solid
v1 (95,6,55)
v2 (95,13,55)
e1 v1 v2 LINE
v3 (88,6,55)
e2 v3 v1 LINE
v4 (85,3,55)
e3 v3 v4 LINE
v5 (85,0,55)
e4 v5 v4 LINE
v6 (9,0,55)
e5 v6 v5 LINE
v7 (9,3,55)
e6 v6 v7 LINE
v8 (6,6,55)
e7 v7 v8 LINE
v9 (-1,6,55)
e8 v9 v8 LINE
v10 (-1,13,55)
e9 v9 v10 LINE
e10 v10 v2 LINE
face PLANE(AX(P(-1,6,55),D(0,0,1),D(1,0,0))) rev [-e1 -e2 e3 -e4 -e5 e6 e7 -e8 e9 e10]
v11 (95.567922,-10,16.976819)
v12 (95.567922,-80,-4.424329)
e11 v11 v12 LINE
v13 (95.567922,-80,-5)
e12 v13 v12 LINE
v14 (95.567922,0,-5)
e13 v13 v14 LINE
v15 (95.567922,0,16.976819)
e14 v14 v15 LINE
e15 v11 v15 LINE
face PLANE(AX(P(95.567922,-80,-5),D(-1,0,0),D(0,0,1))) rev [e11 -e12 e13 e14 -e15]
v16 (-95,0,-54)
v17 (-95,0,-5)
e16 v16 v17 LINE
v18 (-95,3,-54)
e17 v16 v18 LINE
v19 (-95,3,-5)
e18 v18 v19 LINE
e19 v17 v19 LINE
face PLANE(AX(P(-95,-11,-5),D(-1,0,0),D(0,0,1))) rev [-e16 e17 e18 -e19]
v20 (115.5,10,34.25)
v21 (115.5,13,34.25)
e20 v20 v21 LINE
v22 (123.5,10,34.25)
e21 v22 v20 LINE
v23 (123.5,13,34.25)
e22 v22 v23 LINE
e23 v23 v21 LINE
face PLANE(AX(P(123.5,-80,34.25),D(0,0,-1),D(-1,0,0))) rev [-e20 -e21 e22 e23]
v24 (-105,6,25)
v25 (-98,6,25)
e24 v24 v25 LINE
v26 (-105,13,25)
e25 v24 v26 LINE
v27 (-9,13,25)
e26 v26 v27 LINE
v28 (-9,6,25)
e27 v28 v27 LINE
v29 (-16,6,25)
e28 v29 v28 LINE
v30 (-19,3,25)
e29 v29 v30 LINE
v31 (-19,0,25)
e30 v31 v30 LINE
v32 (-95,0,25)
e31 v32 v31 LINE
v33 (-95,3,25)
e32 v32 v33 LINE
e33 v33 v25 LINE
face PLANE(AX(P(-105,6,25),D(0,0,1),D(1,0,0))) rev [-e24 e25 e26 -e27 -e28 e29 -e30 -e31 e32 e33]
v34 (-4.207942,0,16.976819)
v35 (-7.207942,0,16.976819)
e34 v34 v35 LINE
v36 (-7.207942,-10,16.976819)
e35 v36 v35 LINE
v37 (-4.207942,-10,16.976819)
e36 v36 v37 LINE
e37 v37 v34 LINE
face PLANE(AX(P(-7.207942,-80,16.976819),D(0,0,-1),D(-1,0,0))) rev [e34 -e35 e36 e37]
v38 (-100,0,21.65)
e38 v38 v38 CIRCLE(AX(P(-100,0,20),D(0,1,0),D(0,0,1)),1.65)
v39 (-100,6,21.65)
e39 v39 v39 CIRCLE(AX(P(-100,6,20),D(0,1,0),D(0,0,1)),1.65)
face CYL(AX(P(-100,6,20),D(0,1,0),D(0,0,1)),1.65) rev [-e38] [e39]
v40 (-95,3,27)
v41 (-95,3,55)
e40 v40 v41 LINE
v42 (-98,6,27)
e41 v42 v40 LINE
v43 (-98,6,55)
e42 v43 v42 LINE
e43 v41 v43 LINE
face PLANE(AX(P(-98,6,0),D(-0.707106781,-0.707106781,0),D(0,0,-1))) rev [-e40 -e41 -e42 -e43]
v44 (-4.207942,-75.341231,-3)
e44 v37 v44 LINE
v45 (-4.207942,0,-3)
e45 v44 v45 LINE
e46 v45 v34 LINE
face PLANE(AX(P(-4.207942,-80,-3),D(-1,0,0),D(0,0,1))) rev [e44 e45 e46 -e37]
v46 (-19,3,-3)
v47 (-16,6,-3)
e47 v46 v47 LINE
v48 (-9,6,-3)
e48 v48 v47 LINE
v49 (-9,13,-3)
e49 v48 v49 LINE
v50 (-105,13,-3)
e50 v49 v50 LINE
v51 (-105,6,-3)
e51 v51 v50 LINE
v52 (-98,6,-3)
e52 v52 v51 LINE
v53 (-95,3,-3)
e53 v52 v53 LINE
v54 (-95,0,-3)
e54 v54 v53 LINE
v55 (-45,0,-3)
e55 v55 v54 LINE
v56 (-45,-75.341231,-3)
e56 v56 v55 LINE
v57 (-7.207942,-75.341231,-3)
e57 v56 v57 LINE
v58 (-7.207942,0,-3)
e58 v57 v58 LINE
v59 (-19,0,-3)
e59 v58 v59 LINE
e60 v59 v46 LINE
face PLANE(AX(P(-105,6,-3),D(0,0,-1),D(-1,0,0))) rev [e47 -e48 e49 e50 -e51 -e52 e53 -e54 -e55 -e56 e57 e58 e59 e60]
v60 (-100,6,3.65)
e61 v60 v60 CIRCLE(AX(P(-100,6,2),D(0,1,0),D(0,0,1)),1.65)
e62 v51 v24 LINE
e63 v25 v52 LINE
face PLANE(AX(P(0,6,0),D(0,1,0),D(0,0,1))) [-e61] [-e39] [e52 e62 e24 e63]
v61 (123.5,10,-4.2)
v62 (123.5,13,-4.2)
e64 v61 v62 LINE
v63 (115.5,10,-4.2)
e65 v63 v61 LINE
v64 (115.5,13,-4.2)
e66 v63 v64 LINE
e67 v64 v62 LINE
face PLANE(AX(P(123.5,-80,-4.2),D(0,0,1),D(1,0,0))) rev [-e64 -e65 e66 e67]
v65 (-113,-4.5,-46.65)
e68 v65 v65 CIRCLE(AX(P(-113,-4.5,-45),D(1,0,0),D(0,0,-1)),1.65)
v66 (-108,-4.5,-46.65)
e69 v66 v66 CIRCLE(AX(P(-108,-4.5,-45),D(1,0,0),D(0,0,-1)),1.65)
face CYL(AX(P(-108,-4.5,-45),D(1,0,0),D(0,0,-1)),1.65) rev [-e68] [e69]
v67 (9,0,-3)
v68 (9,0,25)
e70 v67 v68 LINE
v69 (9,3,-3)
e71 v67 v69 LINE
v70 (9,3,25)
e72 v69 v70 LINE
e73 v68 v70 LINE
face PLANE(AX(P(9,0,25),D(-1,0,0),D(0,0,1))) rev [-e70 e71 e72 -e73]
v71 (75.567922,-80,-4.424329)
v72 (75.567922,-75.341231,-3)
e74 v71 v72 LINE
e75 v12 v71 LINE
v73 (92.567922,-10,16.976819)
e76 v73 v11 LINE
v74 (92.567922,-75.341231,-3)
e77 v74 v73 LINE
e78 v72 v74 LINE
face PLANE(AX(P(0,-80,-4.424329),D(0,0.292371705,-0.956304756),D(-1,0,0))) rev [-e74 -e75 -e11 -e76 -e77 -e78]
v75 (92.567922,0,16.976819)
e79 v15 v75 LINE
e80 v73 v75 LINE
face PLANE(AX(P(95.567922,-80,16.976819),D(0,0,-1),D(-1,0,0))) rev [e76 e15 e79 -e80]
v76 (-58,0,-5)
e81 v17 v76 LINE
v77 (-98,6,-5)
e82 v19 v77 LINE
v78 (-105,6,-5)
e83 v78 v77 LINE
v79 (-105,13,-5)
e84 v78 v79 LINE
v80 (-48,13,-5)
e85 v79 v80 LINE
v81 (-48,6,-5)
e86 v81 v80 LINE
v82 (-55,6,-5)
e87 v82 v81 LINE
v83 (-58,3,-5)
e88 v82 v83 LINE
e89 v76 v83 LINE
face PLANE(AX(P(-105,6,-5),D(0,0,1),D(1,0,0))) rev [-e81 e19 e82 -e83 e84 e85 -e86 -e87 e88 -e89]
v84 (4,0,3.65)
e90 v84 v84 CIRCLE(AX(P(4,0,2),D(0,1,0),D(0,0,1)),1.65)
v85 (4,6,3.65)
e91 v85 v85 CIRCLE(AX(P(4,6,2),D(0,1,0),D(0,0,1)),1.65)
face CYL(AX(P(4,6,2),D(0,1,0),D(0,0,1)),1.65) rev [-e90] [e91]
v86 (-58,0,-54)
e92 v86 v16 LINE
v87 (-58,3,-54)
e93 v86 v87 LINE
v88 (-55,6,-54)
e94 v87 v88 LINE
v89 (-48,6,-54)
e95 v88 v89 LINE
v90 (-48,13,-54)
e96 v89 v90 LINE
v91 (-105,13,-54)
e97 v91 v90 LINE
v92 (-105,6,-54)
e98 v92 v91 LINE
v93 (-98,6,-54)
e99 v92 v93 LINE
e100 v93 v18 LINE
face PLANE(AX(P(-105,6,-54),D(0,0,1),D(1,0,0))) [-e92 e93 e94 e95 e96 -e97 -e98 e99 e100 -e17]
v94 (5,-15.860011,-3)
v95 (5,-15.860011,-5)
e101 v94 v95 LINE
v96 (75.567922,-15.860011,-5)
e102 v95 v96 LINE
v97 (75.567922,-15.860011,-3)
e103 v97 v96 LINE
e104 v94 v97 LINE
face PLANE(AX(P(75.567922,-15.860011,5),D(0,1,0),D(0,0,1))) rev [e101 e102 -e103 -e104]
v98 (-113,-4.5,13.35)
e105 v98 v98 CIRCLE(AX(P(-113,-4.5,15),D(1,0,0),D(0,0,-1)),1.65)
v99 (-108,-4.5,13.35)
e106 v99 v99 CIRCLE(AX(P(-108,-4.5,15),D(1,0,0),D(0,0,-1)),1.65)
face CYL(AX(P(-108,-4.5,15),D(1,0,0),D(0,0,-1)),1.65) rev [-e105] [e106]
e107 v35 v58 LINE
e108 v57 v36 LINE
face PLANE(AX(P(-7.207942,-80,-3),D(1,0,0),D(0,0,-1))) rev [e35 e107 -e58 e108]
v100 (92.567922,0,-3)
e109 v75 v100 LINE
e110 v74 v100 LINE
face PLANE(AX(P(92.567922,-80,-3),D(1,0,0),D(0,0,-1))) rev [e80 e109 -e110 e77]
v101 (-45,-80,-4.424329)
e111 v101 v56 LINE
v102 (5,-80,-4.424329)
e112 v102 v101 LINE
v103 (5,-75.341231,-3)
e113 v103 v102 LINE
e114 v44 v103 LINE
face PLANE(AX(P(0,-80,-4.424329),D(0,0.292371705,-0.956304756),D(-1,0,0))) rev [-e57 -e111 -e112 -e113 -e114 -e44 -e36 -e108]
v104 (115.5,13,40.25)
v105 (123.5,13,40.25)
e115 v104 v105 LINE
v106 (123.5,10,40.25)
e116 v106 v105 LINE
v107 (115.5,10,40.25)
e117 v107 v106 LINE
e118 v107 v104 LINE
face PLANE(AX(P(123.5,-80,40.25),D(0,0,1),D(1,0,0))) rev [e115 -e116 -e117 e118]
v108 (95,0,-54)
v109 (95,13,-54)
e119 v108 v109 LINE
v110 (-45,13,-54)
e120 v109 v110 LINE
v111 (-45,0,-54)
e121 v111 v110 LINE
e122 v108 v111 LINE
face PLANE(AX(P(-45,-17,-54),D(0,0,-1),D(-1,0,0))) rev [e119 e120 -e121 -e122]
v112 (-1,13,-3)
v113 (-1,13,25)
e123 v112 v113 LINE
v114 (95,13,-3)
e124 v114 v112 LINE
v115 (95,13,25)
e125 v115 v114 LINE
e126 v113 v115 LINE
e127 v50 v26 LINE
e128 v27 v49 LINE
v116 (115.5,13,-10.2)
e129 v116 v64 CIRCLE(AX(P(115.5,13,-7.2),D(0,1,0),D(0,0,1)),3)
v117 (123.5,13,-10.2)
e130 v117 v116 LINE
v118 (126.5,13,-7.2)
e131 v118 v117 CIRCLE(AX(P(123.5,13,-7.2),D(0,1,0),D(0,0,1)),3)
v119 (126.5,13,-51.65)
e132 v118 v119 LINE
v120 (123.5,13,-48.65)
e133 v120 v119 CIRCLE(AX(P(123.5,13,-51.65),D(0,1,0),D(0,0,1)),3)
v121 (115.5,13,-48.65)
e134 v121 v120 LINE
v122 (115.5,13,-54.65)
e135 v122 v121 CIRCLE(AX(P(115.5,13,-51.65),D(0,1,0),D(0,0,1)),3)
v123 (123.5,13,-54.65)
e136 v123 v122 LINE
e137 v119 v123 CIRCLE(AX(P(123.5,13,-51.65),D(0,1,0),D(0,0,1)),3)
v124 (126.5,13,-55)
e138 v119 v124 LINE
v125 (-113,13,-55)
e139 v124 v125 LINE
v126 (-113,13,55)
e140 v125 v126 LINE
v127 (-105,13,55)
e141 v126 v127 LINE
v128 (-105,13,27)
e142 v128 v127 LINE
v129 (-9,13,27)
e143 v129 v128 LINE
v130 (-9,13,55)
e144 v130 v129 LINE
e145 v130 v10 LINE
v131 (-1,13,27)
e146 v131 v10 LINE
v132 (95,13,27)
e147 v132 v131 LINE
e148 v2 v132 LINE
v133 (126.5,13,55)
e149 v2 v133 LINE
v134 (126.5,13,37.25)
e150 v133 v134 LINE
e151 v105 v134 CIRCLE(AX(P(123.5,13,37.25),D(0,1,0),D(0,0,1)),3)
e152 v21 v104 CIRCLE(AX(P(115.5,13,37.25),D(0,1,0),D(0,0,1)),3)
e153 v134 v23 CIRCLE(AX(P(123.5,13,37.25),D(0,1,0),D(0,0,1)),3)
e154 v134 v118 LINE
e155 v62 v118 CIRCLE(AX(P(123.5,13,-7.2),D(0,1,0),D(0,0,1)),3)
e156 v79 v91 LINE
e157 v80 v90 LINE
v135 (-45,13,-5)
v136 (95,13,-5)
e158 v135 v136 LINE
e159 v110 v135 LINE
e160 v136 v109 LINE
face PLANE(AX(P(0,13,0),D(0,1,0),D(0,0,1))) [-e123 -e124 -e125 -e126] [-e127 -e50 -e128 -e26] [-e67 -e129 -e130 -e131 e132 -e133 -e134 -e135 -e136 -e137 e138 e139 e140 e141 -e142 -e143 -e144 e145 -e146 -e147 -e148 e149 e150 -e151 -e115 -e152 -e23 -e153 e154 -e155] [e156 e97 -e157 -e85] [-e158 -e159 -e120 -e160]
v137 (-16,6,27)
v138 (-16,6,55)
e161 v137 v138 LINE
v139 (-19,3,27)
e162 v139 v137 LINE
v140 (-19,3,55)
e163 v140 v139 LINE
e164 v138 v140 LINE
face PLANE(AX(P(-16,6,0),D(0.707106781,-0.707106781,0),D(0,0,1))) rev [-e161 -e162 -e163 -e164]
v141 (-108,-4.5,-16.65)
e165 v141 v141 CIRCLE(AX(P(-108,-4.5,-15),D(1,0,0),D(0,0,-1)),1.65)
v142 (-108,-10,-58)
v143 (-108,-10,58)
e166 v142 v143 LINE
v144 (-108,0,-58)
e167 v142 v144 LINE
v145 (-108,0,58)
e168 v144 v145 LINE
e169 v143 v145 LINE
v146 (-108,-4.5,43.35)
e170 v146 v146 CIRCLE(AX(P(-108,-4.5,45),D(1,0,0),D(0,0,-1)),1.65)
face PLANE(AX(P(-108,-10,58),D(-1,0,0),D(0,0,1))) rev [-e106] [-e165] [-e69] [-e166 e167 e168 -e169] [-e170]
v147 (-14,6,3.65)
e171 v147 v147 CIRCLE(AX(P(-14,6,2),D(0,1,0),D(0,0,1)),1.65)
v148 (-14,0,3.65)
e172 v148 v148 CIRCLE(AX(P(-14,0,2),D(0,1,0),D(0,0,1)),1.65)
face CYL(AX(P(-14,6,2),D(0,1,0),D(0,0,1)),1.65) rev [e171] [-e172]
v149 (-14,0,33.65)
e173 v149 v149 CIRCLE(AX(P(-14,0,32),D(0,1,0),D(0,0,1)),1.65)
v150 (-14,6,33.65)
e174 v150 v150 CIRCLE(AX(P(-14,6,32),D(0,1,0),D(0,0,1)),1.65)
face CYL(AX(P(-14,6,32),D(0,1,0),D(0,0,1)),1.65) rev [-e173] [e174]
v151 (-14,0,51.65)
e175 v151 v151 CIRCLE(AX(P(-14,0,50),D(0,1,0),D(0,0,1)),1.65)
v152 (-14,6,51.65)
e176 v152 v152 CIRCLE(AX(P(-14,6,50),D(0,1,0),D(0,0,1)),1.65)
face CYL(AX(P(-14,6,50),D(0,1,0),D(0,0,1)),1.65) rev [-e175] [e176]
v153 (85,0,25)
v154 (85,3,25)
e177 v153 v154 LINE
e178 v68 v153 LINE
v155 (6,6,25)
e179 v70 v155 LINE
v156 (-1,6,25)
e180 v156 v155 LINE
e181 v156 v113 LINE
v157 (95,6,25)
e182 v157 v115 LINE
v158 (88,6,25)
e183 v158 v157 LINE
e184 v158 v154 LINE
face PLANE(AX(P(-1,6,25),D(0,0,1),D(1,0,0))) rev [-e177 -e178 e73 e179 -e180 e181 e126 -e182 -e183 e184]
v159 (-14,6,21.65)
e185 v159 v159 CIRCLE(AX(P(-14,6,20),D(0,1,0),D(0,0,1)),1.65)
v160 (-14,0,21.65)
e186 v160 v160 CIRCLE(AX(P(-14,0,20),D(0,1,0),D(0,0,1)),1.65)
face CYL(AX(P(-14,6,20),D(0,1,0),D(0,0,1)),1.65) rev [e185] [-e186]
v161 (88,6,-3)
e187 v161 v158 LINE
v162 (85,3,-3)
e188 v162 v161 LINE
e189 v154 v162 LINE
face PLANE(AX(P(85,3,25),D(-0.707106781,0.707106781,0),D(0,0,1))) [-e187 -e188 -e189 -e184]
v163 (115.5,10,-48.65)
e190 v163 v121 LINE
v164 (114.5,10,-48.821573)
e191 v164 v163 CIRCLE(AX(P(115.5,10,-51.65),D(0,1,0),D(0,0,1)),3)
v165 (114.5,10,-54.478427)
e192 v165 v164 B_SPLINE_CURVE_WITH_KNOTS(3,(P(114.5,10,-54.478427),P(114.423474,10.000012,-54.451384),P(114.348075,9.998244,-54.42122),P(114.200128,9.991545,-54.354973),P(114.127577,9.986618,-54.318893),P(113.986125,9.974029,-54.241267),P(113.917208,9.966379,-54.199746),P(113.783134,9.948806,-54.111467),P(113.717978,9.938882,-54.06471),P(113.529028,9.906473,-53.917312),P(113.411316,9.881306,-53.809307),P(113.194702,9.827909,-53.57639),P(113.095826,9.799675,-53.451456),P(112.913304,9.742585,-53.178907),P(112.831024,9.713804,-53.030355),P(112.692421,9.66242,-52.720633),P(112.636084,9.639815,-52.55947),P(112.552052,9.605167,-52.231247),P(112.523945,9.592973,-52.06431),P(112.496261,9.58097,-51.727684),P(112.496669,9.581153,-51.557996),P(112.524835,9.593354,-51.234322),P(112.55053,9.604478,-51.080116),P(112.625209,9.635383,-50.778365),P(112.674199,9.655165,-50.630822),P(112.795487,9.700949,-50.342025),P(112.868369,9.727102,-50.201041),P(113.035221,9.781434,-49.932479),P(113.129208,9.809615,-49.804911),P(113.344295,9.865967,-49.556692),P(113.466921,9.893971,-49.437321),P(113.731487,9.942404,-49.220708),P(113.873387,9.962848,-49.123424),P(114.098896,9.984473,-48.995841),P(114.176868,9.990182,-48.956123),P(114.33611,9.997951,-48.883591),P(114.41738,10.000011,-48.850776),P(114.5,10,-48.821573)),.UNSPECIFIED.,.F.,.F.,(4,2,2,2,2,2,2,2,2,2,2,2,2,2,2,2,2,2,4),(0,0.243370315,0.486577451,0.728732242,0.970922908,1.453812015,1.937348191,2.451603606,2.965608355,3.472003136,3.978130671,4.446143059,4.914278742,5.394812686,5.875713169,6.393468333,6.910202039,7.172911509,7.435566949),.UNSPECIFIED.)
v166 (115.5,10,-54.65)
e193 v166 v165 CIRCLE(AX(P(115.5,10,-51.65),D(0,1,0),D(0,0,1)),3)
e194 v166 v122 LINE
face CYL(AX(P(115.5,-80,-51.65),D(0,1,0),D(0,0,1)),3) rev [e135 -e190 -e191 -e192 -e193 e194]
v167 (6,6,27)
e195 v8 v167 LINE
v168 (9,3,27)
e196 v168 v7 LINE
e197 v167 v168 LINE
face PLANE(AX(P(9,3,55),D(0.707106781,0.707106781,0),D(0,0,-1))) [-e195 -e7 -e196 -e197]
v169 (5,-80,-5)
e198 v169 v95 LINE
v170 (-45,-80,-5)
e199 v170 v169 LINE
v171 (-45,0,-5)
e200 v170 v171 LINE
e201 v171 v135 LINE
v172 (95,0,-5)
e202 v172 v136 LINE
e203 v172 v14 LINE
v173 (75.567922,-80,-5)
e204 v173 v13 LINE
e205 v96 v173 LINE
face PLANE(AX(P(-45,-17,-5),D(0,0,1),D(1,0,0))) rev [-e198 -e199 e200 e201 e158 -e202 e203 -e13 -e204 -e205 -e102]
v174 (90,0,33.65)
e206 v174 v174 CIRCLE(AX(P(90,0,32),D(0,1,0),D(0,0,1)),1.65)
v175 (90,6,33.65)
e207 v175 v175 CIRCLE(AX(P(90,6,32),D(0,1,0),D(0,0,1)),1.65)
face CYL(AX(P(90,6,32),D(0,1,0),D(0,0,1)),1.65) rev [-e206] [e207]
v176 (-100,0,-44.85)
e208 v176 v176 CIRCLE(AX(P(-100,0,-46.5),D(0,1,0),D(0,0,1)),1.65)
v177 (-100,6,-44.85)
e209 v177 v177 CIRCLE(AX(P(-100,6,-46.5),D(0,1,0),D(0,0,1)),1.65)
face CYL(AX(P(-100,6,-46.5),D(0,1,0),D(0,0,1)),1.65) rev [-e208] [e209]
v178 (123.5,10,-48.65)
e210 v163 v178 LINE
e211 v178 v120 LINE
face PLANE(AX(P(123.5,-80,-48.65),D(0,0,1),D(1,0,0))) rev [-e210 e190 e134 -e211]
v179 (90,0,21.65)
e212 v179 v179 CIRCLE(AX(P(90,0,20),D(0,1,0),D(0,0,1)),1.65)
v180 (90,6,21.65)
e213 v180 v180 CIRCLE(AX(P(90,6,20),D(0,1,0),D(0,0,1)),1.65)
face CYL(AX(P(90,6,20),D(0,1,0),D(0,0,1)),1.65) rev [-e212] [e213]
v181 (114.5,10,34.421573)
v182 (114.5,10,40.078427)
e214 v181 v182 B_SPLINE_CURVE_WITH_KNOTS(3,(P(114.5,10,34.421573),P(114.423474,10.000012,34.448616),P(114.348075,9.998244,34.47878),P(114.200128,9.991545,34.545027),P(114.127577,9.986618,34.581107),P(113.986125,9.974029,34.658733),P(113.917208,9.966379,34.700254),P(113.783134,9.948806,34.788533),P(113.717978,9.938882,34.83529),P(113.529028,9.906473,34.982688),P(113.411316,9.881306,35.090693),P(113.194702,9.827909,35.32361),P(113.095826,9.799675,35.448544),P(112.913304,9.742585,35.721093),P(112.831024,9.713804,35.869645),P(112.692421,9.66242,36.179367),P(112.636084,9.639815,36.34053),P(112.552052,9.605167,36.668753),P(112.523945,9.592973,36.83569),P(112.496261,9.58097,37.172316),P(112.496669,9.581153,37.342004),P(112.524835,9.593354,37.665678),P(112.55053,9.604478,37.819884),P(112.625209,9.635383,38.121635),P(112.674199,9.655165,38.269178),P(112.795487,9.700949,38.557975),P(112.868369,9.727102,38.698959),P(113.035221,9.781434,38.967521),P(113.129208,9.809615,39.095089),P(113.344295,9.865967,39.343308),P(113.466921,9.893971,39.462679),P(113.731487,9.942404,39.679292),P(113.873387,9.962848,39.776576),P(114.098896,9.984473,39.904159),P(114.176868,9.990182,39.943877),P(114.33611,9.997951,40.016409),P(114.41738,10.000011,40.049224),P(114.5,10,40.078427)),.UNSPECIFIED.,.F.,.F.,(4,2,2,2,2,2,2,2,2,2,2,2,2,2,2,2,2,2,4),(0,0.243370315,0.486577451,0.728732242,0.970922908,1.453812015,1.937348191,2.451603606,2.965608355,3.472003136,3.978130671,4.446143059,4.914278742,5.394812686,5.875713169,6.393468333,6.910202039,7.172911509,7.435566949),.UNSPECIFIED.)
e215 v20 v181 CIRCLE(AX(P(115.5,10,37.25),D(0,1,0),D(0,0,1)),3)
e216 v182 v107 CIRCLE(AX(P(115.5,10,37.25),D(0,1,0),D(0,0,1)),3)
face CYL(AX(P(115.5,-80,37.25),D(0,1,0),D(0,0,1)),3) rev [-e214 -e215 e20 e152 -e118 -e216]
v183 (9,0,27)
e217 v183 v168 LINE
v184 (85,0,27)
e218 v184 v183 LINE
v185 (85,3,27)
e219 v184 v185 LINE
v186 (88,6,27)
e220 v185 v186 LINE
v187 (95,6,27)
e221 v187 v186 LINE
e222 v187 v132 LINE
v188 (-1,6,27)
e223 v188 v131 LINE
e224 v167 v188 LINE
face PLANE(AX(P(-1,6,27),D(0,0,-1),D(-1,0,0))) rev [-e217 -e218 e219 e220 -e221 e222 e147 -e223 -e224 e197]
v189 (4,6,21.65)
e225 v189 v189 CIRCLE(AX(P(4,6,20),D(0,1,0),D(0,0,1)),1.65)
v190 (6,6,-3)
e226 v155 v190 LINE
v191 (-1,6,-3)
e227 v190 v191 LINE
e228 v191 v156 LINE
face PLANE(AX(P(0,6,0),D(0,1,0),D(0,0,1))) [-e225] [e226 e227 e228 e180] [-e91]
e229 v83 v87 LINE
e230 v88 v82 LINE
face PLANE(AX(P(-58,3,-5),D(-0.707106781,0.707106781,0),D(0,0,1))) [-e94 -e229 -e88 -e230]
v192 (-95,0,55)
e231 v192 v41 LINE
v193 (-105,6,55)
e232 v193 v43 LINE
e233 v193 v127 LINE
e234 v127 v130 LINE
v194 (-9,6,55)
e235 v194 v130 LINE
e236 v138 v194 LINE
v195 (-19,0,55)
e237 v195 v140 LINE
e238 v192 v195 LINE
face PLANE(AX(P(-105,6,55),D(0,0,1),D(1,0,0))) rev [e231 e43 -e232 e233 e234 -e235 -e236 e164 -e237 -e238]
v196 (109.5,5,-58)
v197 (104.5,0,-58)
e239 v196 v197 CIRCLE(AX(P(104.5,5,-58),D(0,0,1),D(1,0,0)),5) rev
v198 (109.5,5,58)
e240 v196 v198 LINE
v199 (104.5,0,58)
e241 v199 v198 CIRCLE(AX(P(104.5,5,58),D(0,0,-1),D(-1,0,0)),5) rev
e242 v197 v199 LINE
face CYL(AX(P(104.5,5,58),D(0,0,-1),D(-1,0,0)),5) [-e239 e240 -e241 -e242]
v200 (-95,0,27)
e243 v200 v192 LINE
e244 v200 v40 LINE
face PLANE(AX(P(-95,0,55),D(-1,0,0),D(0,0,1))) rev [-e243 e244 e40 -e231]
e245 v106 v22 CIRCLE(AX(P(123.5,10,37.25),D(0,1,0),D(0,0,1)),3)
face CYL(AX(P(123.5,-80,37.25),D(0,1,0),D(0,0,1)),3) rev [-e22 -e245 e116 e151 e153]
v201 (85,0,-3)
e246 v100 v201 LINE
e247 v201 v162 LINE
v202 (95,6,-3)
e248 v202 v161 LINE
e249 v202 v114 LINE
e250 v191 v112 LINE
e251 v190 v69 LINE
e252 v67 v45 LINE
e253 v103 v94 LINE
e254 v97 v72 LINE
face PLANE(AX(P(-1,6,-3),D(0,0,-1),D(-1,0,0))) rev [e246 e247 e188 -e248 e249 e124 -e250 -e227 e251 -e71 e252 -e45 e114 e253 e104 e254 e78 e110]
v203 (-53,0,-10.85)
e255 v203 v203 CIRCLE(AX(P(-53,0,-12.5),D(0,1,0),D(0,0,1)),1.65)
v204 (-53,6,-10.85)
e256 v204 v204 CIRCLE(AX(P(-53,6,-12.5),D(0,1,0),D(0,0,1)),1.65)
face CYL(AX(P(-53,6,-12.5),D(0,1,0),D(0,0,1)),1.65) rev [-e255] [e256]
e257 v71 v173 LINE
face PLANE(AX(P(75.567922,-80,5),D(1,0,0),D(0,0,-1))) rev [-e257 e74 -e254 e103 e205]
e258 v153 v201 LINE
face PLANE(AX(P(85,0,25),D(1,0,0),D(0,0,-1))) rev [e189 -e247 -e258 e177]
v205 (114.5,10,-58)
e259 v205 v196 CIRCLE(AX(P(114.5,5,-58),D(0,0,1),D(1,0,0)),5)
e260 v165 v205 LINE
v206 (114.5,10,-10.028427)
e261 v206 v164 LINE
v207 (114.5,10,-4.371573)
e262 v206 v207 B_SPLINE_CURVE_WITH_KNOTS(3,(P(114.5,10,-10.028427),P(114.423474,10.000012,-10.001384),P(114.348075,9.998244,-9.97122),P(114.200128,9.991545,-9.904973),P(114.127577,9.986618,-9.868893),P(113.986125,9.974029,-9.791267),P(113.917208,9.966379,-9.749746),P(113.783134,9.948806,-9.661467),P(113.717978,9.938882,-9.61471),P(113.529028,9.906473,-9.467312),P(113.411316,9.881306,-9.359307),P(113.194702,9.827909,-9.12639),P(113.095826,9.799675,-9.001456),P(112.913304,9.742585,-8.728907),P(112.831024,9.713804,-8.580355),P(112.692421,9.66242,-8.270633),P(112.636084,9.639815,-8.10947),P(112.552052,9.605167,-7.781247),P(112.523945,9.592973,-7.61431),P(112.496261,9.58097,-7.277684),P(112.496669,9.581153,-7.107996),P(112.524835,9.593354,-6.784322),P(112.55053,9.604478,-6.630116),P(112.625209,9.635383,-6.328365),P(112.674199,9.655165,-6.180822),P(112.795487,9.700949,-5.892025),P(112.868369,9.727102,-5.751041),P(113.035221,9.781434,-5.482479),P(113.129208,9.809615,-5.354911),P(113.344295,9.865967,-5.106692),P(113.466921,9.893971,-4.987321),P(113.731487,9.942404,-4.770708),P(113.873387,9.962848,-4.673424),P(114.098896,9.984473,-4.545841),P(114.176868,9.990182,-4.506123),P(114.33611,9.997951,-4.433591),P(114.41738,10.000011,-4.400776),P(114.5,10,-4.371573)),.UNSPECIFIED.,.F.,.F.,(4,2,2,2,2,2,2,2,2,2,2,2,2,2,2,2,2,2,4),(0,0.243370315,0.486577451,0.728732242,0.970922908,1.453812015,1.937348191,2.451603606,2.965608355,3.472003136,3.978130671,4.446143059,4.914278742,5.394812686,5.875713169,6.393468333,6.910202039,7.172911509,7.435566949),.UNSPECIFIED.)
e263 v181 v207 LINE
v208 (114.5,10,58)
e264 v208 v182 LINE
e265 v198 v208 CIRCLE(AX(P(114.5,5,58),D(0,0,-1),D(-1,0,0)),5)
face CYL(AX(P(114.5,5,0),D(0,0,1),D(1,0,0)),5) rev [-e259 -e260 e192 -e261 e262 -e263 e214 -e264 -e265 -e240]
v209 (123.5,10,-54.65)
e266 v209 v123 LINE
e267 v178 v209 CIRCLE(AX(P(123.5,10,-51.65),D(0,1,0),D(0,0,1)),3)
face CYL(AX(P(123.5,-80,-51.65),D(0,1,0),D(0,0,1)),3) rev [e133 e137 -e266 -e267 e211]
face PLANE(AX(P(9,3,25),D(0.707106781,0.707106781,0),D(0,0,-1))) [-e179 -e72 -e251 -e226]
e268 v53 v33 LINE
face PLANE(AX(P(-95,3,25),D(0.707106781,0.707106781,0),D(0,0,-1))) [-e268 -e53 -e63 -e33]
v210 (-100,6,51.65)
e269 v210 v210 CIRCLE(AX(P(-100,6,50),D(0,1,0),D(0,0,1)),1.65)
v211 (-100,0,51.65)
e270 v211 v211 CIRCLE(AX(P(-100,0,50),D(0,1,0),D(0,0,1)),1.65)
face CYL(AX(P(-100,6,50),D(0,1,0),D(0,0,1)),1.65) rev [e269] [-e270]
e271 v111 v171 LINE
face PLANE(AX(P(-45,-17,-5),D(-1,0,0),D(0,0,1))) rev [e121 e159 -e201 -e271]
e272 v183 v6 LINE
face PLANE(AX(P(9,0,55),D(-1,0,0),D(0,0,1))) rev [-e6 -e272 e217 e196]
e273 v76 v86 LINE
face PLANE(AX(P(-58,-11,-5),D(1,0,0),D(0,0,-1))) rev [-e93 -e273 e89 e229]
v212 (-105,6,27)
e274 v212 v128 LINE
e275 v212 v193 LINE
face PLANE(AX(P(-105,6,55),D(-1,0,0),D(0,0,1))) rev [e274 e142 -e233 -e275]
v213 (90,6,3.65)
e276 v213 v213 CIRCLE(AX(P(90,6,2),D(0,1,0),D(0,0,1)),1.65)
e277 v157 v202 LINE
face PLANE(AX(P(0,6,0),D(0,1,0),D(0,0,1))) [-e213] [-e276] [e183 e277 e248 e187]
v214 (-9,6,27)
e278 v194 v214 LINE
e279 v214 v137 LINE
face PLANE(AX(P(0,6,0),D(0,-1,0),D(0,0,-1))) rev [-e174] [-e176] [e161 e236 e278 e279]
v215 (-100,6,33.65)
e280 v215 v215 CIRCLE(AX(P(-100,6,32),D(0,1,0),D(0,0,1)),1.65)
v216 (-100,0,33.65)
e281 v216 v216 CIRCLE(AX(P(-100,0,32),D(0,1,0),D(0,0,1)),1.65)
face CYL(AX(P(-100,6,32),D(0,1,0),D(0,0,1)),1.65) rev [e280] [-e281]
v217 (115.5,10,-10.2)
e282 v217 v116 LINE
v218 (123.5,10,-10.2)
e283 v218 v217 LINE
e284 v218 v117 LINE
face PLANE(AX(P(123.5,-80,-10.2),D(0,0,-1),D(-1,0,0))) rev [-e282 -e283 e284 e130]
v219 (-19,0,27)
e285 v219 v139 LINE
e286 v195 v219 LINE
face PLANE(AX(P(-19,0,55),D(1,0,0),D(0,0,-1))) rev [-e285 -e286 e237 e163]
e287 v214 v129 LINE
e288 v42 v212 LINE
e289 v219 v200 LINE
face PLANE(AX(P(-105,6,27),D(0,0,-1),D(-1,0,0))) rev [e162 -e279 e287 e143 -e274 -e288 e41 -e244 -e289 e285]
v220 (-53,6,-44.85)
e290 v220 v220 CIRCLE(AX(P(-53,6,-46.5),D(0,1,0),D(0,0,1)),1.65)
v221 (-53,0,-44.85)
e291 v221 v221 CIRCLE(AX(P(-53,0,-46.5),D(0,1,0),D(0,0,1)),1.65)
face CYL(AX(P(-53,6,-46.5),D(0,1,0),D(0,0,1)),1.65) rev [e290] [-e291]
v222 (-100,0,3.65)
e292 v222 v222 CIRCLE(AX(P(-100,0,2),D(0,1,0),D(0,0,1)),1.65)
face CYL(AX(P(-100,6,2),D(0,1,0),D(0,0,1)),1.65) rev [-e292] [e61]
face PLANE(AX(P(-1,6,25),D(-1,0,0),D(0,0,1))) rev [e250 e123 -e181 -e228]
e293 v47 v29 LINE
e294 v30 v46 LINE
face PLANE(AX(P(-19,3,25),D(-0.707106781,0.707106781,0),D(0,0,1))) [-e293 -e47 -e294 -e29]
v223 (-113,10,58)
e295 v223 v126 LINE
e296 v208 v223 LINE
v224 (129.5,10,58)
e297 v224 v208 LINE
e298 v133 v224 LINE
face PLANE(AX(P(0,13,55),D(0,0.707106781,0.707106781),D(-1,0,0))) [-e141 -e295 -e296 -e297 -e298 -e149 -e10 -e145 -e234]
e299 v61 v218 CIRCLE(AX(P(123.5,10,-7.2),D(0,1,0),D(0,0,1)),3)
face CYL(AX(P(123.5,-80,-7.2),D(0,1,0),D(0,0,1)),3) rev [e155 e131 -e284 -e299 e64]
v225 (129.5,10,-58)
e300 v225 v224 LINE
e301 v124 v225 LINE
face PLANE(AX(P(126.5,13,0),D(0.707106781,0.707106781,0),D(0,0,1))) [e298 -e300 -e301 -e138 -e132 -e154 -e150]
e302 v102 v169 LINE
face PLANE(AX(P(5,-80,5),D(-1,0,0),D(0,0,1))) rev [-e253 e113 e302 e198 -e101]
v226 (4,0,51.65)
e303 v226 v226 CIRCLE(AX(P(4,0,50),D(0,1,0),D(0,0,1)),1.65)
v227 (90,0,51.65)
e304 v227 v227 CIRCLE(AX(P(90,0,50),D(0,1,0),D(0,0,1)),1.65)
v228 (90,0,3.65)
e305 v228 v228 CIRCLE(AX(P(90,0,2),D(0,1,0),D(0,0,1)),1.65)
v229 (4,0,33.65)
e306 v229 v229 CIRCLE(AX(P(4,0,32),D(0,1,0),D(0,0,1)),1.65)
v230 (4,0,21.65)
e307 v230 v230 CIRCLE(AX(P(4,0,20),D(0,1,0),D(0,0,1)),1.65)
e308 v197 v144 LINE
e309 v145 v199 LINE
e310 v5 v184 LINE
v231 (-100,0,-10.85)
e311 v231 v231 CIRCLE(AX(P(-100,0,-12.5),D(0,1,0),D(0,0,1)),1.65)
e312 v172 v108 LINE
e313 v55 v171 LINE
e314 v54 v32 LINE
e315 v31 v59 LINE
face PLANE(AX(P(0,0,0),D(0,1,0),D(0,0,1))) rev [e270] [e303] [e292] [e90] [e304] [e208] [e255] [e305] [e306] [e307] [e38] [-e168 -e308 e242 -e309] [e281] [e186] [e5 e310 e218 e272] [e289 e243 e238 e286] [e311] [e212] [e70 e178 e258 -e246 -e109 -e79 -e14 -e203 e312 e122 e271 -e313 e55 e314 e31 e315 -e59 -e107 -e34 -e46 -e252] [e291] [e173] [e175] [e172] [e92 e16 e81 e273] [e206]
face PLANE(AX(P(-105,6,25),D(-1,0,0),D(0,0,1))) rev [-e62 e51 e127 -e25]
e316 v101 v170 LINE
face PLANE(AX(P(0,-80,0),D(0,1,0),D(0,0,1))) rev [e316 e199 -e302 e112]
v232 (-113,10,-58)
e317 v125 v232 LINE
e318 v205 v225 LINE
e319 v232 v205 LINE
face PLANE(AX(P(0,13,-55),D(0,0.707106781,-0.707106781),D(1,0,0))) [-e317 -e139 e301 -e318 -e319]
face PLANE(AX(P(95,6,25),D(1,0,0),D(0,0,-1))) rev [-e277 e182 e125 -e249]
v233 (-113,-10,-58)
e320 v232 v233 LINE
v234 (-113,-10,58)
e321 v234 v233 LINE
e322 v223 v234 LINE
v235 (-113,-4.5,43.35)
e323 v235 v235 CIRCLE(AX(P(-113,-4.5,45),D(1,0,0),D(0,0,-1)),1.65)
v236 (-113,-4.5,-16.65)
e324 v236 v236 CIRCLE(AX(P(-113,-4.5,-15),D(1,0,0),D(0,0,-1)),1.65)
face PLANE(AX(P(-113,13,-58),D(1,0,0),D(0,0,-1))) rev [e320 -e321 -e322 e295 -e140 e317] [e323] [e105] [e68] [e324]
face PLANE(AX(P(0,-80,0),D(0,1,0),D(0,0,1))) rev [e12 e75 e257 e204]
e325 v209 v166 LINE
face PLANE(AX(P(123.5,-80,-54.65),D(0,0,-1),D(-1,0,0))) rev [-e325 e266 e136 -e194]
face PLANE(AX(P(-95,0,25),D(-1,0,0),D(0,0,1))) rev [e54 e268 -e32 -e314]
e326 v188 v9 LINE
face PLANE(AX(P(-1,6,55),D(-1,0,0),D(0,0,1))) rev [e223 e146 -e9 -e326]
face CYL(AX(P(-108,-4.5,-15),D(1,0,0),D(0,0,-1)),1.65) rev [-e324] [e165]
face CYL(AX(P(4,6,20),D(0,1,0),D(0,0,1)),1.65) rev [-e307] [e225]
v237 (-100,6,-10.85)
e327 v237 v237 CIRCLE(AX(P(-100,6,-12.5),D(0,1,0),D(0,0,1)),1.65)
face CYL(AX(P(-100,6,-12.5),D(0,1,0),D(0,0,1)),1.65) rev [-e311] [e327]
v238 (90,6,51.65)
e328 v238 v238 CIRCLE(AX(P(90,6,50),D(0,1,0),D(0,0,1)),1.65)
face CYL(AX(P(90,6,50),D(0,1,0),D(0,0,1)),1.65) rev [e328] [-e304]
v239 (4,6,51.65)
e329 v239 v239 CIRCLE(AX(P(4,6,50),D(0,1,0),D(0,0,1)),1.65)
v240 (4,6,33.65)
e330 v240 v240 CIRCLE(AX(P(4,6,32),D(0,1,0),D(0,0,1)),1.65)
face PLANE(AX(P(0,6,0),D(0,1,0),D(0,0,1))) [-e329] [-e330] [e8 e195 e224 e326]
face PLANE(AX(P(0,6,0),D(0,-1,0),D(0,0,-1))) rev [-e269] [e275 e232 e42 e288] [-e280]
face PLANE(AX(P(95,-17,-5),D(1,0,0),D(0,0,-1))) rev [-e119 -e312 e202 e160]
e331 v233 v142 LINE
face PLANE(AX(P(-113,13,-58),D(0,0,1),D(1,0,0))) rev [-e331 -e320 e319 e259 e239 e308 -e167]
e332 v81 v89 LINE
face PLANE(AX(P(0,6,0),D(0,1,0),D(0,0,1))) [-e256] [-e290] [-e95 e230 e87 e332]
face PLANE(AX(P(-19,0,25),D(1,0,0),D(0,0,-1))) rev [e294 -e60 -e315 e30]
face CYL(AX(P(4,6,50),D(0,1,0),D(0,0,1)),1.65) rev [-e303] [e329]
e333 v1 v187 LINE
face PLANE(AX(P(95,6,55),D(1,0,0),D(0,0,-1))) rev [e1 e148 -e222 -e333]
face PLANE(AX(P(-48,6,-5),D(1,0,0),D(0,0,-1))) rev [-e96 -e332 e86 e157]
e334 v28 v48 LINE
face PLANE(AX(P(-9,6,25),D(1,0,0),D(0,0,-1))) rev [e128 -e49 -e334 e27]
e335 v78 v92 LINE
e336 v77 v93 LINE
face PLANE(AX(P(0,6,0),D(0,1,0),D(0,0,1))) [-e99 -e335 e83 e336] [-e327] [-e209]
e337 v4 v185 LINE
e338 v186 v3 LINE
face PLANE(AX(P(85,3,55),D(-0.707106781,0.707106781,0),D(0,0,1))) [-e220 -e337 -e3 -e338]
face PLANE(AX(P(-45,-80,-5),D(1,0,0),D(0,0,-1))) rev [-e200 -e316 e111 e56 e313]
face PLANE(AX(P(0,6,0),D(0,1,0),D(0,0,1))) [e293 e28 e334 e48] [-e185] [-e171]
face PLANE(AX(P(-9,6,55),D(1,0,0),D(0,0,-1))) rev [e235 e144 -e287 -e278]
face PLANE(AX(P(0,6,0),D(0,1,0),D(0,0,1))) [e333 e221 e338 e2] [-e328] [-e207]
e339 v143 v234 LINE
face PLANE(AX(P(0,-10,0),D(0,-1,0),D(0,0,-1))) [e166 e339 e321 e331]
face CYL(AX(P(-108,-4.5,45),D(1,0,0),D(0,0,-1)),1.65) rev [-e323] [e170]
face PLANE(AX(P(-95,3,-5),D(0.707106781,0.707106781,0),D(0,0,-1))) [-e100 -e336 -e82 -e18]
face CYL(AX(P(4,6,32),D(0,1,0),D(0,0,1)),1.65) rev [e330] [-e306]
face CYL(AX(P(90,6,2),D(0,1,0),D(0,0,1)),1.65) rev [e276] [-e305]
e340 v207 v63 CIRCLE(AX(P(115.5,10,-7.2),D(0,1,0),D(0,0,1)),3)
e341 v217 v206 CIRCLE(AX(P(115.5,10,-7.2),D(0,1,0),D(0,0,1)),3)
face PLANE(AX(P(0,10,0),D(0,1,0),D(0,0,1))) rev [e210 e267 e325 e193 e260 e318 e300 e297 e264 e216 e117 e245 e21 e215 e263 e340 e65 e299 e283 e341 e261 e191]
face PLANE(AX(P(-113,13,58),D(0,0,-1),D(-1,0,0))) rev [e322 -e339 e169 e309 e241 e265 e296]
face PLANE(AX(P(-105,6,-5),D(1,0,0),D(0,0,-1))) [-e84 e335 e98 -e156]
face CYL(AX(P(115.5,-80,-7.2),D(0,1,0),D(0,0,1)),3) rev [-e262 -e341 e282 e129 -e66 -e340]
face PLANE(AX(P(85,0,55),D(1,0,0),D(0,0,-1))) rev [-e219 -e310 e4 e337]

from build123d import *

# Parameters (mm, degrees)
SKETCH1_W                      = 242.5
SKETCH1_H                      = 116
BOSS_EXTRUDE1_DEPTH            = 13
SKETCH32_W                     = 20
SKETCH32_H                     = 116
CUT_EXTRUDE10_DEPTH            = 10
FILLET1_START                  = -59
FILLET1_DEPTH                  = 118
FILLET1_START_2                = -58
FILLET1_2_DEPTH                = 116
SKETCH36_W                     = 96
SKETCH36_H                     = 28
CUT_EXTRUDE11_DEPTH            = 7
SKETCH37_W                     = 76
SKETCH37_H                     = 28
CUT_EXTRUDE12_DEPTH            = 143.489473295
M4X0_7_TAPPED_HOLE1_AT_2_COUNT = 2
M4X0_7_TAPPED_HOLE1_AT_2_PITCH = 18
M4X0_7_TAPPED_HOLE1_AT_3_COUNT = 2
M4X0_7_TAPPED_HOLE1_AT_3_PITCH = 86
M4X0_7_TAPPED_HOLE1_AT_4_COUNT = 2
M4X0_7_TAPPED_HOLE1_AT_4_PITCH = 87.863530546
LPATTERN1_COUNT                = 2
LPATTERN1_PITCH                = 30
LPATTERN1_COUNT_DIR2           = 2
LPATTERN1_PITCH_DIR2           = 104
CHAMFER1_SIZE                  = 3
SKETCH41_W                     = 140
SKETCH41_H                     = 49
CUT_EXTRUDE13_DEPTH            = 30
BOSS_EXTRUDE2_DEPTH            = 80
SKETCH43_W                     = 57
SKETCH43_H                     = 49
CUT_EXTRUDE14_DEPTH            = 7
SKETCH44_W                     = 37
SKETCH44_H                     = 49
CUT_EXTRUDE15_DEPTH            = 17
CHAMFER2_SIZE                  = 3
M4X0_7_TAPPED_HOLE2_D          = 3.3
M4X0_7_TAPPED_HOLE2_DEPTH      = 10.1
M4X0_7_TAPPED_HOLE2_TIP        = 0.991420021
CHAMFER3_SIZE                  = 70
CHAMFER3_SIZE2                 = 21.401147702
SKETCH48_W                     = 5
SKETCH48_H                     = 116
BOSS_EXTRUDE3_DEPTH            = 10
SKETCH49_W                     = 70.567921878
SKETCH49_H                     = 64.139989259
CUT_EXTRUDE16_DEPTH            = 10
M4X0_7_TAPPED_HOLE3_D          = 3.3
M4X0_7_TAPPED_HOLE3_DEPTH      = 5
CUT_EXTRUDE17_DEPTH            = 170.656270146


with BuildPart() as part:
    # Sketch1 → Boss-Extrude1 (new body)
    with BuildSketch(Plane(origin=(0, 0, 0), x_dir=(1, 0, 0), z_dir=(0, 1, 0))):
        with Locations((8.25, 0)):
            Rectangle(SKETCH1_W, SKETCH1_H)
    extrude(amount=BOSS_EXTRUDE1_DEPTH)

    # Sketch32 → Cut-Extrude10 (cut)
    with BuildSketch(Plane.XZ):
        with Locations((119.5, 0)):
            Rectangle(SKETCH32_W, SKETCH32_H)
    extrude(amount=-CUT_EXTRUDE10_DEPTH, mode=Mode.SUBTRACT)

    # Fillet1: read off the stored shape, not the designer's step
    # Fillet1 outline → Fillet1 (cut)
    with BuildSketch(Plane.XY.offset(FILLET1_START)):
        with BuildLine():
            Line((109.5, 0), (109.5, 5))
            ThreePointArc((109.5, 5), (108.035533906, 1.464466094), (104.5, 0))
            Line((104.5, 0), (109.5, 0))
        make_face()
    extrude(amount=FILLET1_DEPTH, mode=Mode.SUBTRACT)

    # Fillet1 2 outline → Fillet1 2 (add)
    with BuildSketch(Plane.XY.offset(FILLET1_START_2)):
        with BuildLine():
            ThreePointArc((109.5, 5), (110.964466094, 8.535533906), (114.5, 10))
            Line((114.5, 10), (109.5, 10))
            Line((109.5, 10), (109.5, 5))
        make_face()
    extrude(amount=FILLET1_2_DEPTH)

    # Sketch36 → Cut-Extrude11 (cut)
    with BuildSketch(Plane(origin=(0, 13, 0), x_dir=(1, 0, 0), z_dir=(0, 1, 0))):
        with Locations((-57, -41)):
            Rectangle(SKETCH36_W, SKETCH36_H)
        with Locations((-57, -11)):
            Rectangle(SKETCH36_W, SKETCH36_H)
        with Locations((47, -11)):
            Rectangle(SKETCH36_W, SKETCH36_H)
        with Locations((47, -41)):
            Rectangle(SKETCH36_W, SKETCH36_H)
    extrude(amount=-CUT_EXTRUDE11_DEPTH, mode=Mode.SUBTRACT)

    # Sketch37 → Cut-Extrude12 (cut, through all)
    with BuildSketch(Plane(origin=(0, 13, 0), x_dir=(1, 0, 0), z_dir=(0, 1, 0))):
        with Locations((-57, -41)):
            Rectangle(SKETCH37_W, SKETCH37_H)
        with Locations((-57, -11)):
            Rectangle(SKETCH37_W, SKETCH37_H)
        with Locations((47, -11)):
            Rectangle(SKETCH37_W, SKETCH37_H)
        with Locations((47, -41)):
            Rectangle(SKETCH37_W, SKETCH37_H)
    extrude(amount=-CUT_EXTRUDE12_DEPTH, mode=Mode.SUBTRACT)

    # Sketch39 → M4x0.7 Tapped Hole1 (revolve, cut)
    with BuildSketch(Plane(origin=(-100, 6, 50), x_dir=(0, 0, 1), z_dir=(1, 0, 0))):
        Polygon((0, 0), (0, 11.091420021), (1.65, 10.1), (1.65, 0), align=None)
    m4x0_7_tapped_hole1 = revolve(axis=Axis((-100, 12.35, 50), (0, -1, 0)), mode=Mode.SUBTRACT)

    # M4x0.7 Tapped Hole1 at 2: M4x0.7 Tapped Hole1 ×2
    with Locations(*[(0, 0, -i * M4X0_7_TAPPED_HOLE1_AT_2_PITCH) for i in range(1, M4X0_7_TAPPED_HOLE1_AT_2_COUNT)]):
        add(m4x0_7_tapped_hole1, mode=Mode.SUBTRACT)

    # M4x0.7 Tapped Hole1 at 3: M4x0.7 Tapped Hole1 ×2
    with Locations(*[(i * M4X0_7_TAPPED_HOLE1_AT_3_PITCH, 0, 0) for i in range(1, M4X0_7_TAPPED_HOLE1_AT_3_COUNT)]):
        add(m4x0_7_tapped_hole1, mode=Mode.SUBTRACT)

    # M4x0.7 Tapped Hole1 at 4: M4x0.7 Tapped Hole1 ×2
    with Locations(*[Vector(0.9787906252528686, 0, -0.20486315412269346) * (i * M4X0_7_TAPPED_HOLE1_AT_4_PITCH) for i in range(1, M4X0_7_TAPPED_HOLE1_AT_4_COUNT)]):
        add(m4x0_7_tapped_hole1, mode=Mode.SUBTRACT)

    # LPattern1: M4x0.7 Tapped Hole1 2 × 2
    with Locations(*[(j * LPATTERN1_PITCH_DIR2, 0, -i * LPATTERN1_PITCH) for i in range(LPATTERN1_COUNT) for j in range(LPATTERN1_COUNT_DIR2) if (i, j) != (0, 0)]):
        add(m4x0_7_tapped_hole1, mode=Mode.SUBTRACT)

    # LPattern1 copy 1 sketch → LPattern1 copy 1 (revolve, cut)
    with BuildSketch(Plane(origin=(4, 6, 32), x_dir=(0, 0, 1), z_dir=(1, 0, 0))):
        Polygon((0, 0), (0, 11.091420021), (1.65, 10.1), (1.65, 0), align=None)
    revolve(axis=Axis((4, 12.35, 32), (0, -1, 0)), mode=Mode.SUBTRACT)

    # LPattern1 copy 2 sketch → LPattern1 copy 2 (revolve, cut)
    with BuildSketch(Plane(origin=(-100, 6, 2), x_dir=(0, 0, 1), z_dir=(1, 0, 0))):
        Polygon((0, 0), (0, 11.091420021), (1.65, 10.1), (1.65, 0), align=None)
    revolve(axis=Axis((-100, 12.35, 2), (0, -1, 0)), mode=Mode.SUBTRACT)

    # LPattern1 copy 3 sketch → LPattern1 copy 3 (revolve, cut)
    with BuildSketch(Plane(origin=(4, 6, 2), x_dir=(0, 0, 1), z_dir=(1, 0, 0))):
        Polygon((0, 0), (0, 11.091420021), (1.65, 10.1), (1.65, 0), align=None)
    revolve(axis=Axis((4, 12.35, 2), (0, -1, 0)), mode=Mode.SUBTRACT)

    # LPattern1 copy 4 sketch → LPattern1 copy 4 (revolve, cut)
    with BuildSketch(Plane(origin=(90, 6, 50), x_dir=(0, 0, 1), z_dir=(1, 0, 0))):
        Polygon((0, 0), (0, 11.091420021), (1.65, 10.1), (1.65, 0), align=None)
    revolve(axis=Axis((90, 12.35, 50), (0, -1, 0)), mode=Mode.SUBTRACT)

    # LPattern1 copy 5 sketch → LPattern1 copy 5 (revolve, cut)
    with BuildSketch(Plane(origin=(-14, 6, 20), x_dir=(0, 0, 1), z_dir=(1, 0, 0))):
        Polygon((0, 0), (0, 11.091420021), (1.65, 10.1), (1.65, 0), align=None)
    revolve(axis=Axis((-14, 12.35, 20), (0, -1, 0)), mode=Mode.SUBTRACT)

    # LPattern1 copy 6 sketch → LPattern1 copy 6 (revolve, cut)
    with BuildSketch(Plane(origin=(90, 6, 20), x_dir=(0, 0, 1), z_dir=(1, 0, 0))):
        Polygon((0, 0), (0, 11.091420021), (1.65, 10.1), (1.65, 0), align=None)
    revolve(axis=Axis((90, 12.35, 20), (0, -1, 0)), mode=Mode.SUBTRACT)

    # LPattern1 copy 7 sketch → LPattern1 copy 7 (revolve, cut)
    with BuildSketch(Plane(origin=(90, 6, 32), x_dir=(0, 0, 1), z_dir=(1, 0, 0))):
        Polygon((0, 0), (0, 11.091420021), (1.65, 10.1), (1.65, 0), align=None)
    revolve(axis=Axis((90, 12.35, 32), (0, -1, 0)), mode=Mode.SUBTRACT)

    # LPattern1 copy 8 sketch → LPattern1 copy 8 (revolve, cut)
    with BuildSketch(Plane(origin=(-14, 6, 2), x_dir=(0, 0, 1), z_dir=(1, 0, 0))):
        Polygon((0, 0), (0, 11.091420021), (1.65, 10.1), (1.65, 0), align=None)
    revolve(axis=Axis((-14, 12.35, 2), (0, -1, 0)), mode=Mode.SUBTRACT)

    # LPattern1 copy 9 sketch → LPattern1 copy 9 (revolve, cut)
    with BuildSketch(Plane(origin=(90, 6, 2), x_dir=(0, 0, 1), z_dir=(1, 0, 0))):
        Polygon((0, 0), (0, 11.091420021), (1.65, 10.1), (1.65, 0), align=None)
    revolve(axis=Axis((90, 12.35, 2), (0, -1, 0)), mode=Mode.SUBTRACT)

    # Chamfer1
    chamfer1_edges = [part.edges().sort_by_distance(p)[0] for p in [
        (-95, 6, 11),
        (-19, 6, 11),
        (-19, 6, 41),
        (-95, 6, 41),
        (85, 6, 11),
        (9, 6, 11),
        (9, 6, 41),
        (85, 6, 41),
        (8.25, 13, -58),
        (129.5, 13, 0),
        (8.25, 13, 58),
    ]]
    chamfer(chamfer1_edges, length=CHAMFER1_SIZE - 0.0001)  # a hair under: the kernel refuses the full size

    # Sketch41 → Cut-Extrude13 (cut)
    with BuildSketch(Plane(origin=(0, 13, 0), x_dir=(1, 0, 0), z_dir=(0, 1, 0))):
        with Locations((25, 29.5)):
            Rectangle(SKETCH41_W, SKETCH41_H)
    extrude(amount=-CUT_EXTRUDE13_DEPTH, mode=Mode.SUBTRACT)

    # Sketch42 → Boss-Extrude2 (add)
    with BuildSketch(Plane.XZ):
        Polygon((-45, -5), (-45, -3), (-7.207942419, -3), (-7.207942419, 16.976819085), (-4.207942419, 16.976819085), (-4.207942419, -3), (92.567921878, -3), (92.567921878, 16.976819085), (95.567921878, 16.976819085), (95.567921878, -5), align=None)
    extrude(amount=BOSS_EXTRUDE2_DEPTH)

    # Sketch43 → Cut-Extrude14 (cut)
    with BuildSketch(Plane(origin=(0, 13, 0), x_dir=(1, 0, 0), z_dir=(0, 1, 0))):
        with Locations((-76.5, 29.5)):
            Rectangle(SKETCH43_W, SKETCH43_H)
    extrude(amount=-CUT_EXTRUDE14_DEPTH, mode=Mode.SUBTRACT)

    # Sketch44 → Cut-Extrude15 (cut)
    with BuildSketch(Plane(origin=(0, 6, 0), x_dir=(1, 0, 0), z_dir=(0, 1, 0))):
        with Locations((-76.5, 29.5)):
            Rectangle(SKETCH44_W, SKETCH44_H)
    extrude(amount=-CUT_EXTRUDE15_DEPTH, mode=Mode.SUBTRACT)

    # Chamfer2
    chamfer2_edges = [part.edges().sort_by_distance(p)[0] for p in [
        (-95, 6, -29.5),
        (-58, 6, -29.5),
    ]]
    chamfer(chamfer2_edges, length=CHAMFER2_SIZE)

    # M4x0.7 Tapped Hole2
    with Locations(Plane(origin=(0, 6, 0), x_dir=(1, 0, 0), z_dir=(0, 1, 0))):
        with Locations((-100, 12.5), (-100, 46.5), (-53, 46.5), (-53, 12.5)):
            Hole(M4X0_7_TAPPED_HOLE2_D / 2, depth=M4X0_7_TAPPED_HOLE2_DEPTH)
            with Locations((0, 0, -(M4X0_7_TAPPED_HOLE2_DEPTH + M4X0_7_TAPPED_HOLE2_TIP / 2))):  # 118° drill point
                Cone(0, M4X0_7_TAPPED_HOLE2_D / 2, M4X0_7_TAPPED_HOLE2_TIP, mode=Mode.SUBTRACT)

    # Chamfer3
    chamfer3_edges = [part.edges().sort_by_distance(p)[0] for p in [
        (-5.707942419, -80, 16.976819085),
    ]]
    chamfer3_side = [part.faces().sort_by_distance(p)[0] for p in [
        (-5.707942419, -40, 16.976819085),
    ]]
    chamfer(chamfer3_edges, length=CHAMFER3_SIZE, length2=CHAMFER3_SIZE2, reference=chamfer3_side[0])

    # Sketch48 → Boss-Extrude3 (add)
    with BuildSketch(Plane.XZ):
        with Locations((-110.5, 0)):
            Rectangle(SKETCH48_W, SKETCH48_H)
    extrude(amount=BOSS_EXTRUDE3_DEPTH)

    # Sketch49 → Cut-Extrude16 (cut)
    with BuildSketch(Plane(origin=(0, 0, -5), x_dir=(-1, 0, 0), z_dir=(0, 0, -1))):
        with Locations((-40.283960939, -47.93000537)):
            Rectangle(SKETCH49_W, SKETCH49_H)
    extrude(amount=-CUT_EXTRUDE16_DEPTH, mode=Mode.SUBTRACT)

    # M4x0.7 Tapped Hole3
    with Locations(Plane(origin=(-108, 0, 0), x_dir=(0, 0, -1), z_dir=(1, 0, 0))):
        with Locations((15, -4.5), (45, -4.5), (-15, -4.5), (-45, -4.5)):
            Hole(M4X0_7_TAPPED_HOLE3_D / 2, depth=M4X0_7_TAPPED_HOLE3_DEPTH)

    # Sketch53 → Cut-Extrude17 (cut, through all)
    with BuildSketch(Plane(origin=(0, 13, 0), x_dir=(1, 0, 0), z_dir=(0, 1, 0))):
        with BuildLine():
            Line((123.5, 48.65), (115.5, 48.65))
            ThreePointArc((115.5, 48.65), (112.5, 51.65), (115.5, 54.65))
            Line((115.5, 54.65), (123.5, 54.65))
            ThreePointArc((123.5, 54.65), (126.5, 51.65), (123.5, 48.65))
        make_face()
        with BuildLine():
            Line((123.5, 4.2), (115.5, 4.2))
            ThreePointArc((115.5, 4.2), (112.5, 7.2), (115.5, 10.2))
            Line((115.5, 10.2), (123.5, 10.2))
            ThreePointArc((123.5, 10.2), (126.5, 7.2), (123.5, 4.2))
        make_face()
        with BuildLine():
            Line((123.5, -40.25), (115.5, -40.25))
            ThreePointArc((115.5, -40.25), (112.5, -37.25), (115.5, -34.25))
            Line((115.5, -34.25), (123.5, -34.25))
            ThreePointArc((123.5, -34.25), (126.5, -37.25), (123.5, -40.25))
        make_face()
    extrude(amount=-CUT_EXTRUDE17_DEPTH, mode=Mode.SUBTRACT)


solid = part.part
